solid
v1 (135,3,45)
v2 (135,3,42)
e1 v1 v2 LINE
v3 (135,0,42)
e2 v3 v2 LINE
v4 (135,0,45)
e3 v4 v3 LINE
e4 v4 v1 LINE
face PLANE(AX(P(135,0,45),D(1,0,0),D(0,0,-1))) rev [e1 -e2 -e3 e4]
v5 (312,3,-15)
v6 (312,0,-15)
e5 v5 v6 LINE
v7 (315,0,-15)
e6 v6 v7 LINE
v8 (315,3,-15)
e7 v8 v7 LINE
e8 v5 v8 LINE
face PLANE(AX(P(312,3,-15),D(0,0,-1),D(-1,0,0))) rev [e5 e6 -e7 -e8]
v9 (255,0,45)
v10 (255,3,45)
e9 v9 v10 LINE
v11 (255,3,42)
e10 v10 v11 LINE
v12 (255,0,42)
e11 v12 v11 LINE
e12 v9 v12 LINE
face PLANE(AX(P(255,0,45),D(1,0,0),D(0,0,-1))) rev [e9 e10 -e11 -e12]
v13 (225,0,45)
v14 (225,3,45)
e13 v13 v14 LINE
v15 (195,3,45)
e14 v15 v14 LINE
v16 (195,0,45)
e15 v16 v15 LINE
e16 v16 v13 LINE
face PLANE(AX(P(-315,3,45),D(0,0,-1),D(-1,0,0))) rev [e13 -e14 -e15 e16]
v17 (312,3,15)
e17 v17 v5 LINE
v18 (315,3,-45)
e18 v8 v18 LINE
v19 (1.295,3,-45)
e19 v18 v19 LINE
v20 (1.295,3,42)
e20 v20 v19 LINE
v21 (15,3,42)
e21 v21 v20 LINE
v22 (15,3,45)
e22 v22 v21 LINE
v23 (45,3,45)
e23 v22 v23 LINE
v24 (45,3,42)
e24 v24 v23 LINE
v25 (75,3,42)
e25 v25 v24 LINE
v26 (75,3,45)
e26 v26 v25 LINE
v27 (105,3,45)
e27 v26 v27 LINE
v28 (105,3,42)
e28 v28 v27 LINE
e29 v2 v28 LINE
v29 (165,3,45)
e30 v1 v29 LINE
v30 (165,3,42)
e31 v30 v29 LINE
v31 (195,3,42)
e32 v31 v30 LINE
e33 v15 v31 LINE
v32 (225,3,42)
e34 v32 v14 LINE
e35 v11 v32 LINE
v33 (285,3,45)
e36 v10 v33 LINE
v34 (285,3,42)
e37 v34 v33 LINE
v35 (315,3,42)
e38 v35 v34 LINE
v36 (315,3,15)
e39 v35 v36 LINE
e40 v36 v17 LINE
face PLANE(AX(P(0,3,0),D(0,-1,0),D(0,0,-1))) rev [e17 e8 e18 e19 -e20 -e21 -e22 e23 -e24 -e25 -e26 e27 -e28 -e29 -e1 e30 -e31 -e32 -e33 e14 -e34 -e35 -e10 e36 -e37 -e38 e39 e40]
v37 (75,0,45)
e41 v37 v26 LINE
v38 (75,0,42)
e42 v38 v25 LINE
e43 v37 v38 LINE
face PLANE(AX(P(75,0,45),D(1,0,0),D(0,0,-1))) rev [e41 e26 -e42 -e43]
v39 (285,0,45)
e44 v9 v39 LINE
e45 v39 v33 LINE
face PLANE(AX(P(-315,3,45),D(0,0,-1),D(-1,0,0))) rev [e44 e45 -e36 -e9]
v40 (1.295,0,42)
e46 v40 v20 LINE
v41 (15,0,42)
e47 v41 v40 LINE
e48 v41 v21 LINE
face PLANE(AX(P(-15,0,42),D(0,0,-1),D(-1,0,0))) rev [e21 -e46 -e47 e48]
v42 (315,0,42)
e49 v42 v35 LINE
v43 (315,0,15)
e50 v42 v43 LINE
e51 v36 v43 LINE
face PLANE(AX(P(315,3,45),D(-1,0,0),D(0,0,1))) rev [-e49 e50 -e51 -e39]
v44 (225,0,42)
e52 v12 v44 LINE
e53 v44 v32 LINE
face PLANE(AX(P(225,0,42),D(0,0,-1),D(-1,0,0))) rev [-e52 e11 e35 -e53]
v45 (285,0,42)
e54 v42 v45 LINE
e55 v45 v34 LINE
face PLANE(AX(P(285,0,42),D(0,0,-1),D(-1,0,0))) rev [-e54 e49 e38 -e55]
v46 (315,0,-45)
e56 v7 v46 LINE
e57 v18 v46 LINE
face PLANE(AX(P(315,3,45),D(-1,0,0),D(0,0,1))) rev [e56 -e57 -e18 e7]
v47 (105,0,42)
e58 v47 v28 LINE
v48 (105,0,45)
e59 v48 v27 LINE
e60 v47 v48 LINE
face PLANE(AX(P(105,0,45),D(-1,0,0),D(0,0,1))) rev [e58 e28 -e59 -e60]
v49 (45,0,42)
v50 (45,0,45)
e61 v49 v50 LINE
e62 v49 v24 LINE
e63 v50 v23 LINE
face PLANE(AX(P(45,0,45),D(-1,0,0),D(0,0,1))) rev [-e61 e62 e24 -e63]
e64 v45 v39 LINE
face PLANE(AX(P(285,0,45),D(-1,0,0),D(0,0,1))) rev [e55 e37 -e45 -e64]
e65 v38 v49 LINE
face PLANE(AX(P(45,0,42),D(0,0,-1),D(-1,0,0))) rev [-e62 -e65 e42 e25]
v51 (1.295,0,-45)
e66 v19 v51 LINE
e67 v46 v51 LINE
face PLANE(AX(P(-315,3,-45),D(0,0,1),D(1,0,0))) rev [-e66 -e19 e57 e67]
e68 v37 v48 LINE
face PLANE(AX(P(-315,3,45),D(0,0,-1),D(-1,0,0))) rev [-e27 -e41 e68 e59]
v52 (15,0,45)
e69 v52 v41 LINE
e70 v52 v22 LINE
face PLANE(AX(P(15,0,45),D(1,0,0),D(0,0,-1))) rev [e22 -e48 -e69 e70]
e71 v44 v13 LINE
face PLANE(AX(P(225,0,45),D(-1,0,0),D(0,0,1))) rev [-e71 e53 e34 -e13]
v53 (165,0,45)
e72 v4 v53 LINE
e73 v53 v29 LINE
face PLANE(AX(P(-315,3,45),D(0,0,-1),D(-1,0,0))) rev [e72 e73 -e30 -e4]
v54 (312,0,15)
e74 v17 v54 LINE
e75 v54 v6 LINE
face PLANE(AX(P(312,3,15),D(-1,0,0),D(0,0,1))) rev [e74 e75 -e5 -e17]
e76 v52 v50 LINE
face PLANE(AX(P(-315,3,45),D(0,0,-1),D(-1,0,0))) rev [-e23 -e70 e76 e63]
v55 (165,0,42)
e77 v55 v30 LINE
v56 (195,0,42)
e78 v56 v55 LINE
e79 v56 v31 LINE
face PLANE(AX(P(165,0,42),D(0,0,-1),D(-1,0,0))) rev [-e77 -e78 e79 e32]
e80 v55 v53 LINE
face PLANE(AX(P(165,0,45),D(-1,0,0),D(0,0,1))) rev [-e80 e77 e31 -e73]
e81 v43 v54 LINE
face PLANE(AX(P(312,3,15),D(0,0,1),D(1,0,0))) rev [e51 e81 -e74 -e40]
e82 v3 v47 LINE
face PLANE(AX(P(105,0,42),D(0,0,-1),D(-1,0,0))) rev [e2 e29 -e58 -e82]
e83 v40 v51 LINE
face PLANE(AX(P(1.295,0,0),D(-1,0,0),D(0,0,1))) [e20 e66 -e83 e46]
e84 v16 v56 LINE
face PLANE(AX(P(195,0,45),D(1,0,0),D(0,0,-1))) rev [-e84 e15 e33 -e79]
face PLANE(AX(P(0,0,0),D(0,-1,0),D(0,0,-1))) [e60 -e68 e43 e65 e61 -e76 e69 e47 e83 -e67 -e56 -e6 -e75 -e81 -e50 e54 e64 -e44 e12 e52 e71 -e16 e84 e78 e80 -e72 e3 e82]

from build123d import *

# Parameters (mm, degrees)
SKETCH1_W              = 630
SKETCH1_H              = 90
BOSS_EXTRUDE1_DEPTH    = 3
SKETCH3_W              = 30
SKETCH3_H              = 3
CUT_EXTRUDE1_DEPTH     = 3
LPATTERN1_COUNT        = 10
LPATTERN1_PITCH        = 60
LPATTERN1_COL_COUNT    = 2
LPATTERN1_COL_PITCH    = 60
CUT_EXTRUDE5_START     = -3
CUT_EXTRUDE5_OUTLINE_W = 3
CUT_EXTRUDE5_OUTLINE_H = 30
CUT_EXTRUDE5_DEPTH     = 3
SKETCH7_W              = 3
SKETCH7_H              = 30
CUT_EXTRUDE3_DEPTH     = 3
SKETCH13_W             = 3
SKETCH13_H             = 27
CUT_EXTRUDE4_DEPTH     = 10


# Read off the part's stored shape, not the designer's step: Cut-Extrude5
with BuildPart() as part:
    # Sketch1 → Boss-Extrude1 (new body)
    with BuildSketch(Plane(origin=(0, 0, 0), x_dir=(1, 0, 0), z_dir=(0, 1, 0))):
        Rectangle(SKETCH1_W, SKETCH1_H)
    extrude(amount=BOSS_EXTRUDE1_DEPTH)

    # Sketch3 → Cut-Extrude1 (cut)
    with BuildSketch(Plane(origin=(0, 3, 0), x_dir=(1, 0, 0), z_dir=(0, 1, 0))):
        with Locations((-240, -43.5)):
            Rectangle(SKETCH3_W, SKETCH3_H)
    cut_extrude1 = extrude(amount=-CUT_EXTRUDE1_DEPTH, mode=Mode.SUBTRACT)

    # LPattern1: Cut-Extrude1 ×10
    with Locations(*[(i * LPATTERN1_PITCH, 0, 0) for i in range(1, LPATTERN1_COUNT)]):
        add(cut_extrude1, mode=Mode.SUBTRACT)

    # LPattern1 col: Cut-Extrude1 ×2
    with Locations(*[(-i * LPATTERN1_COL_PITCH, 0, 0) for i in range(1, LPATTERN1_COL_COUNT)]):
        add(cut_extrude1, mode=Mode.SUBTRACT)

    # Cut-Extrude5 outline → Cut-Extrude5 (cut)
    with BuildSketch(Plane(origin=(0, 3, 0), x_dir=(1, 0, 0), z_dir=(0, 1, 0)).offset(CUT_EXTRUDE5_START)):
        with Locations((313.5, 1e-09)):
            Rectangle(CUT_EXTRUDE5_OUTLINE_W, CUT_EXTRUDE5_OUTLINE_H)
    extrude(amount=CUT_EXTRUDE5_DEPTH, mode=Mode.SUBTRACT)

    # Sketch7 → Cut-Extrude3 (cut)
    with BuildSketch(Plane(origin=(0, 3, 0), x_dir=(1, 0, 0), z_dir=(0, 1, 0))):
        with Locations((-313.5, 30)):
            Rectangle(SKETCH7_W, SKETCH7_H)
    extrude(amount=-CUT_EXTRUDE3_DEPTH, mode=Mode.SUBTRACT)

    # Sketch13 → Cut-Extrude4 (cut)
    with BuildSketch(Plane(origin=(0, 3, 0), x_dir=(1, 0, 0), z_dir=(0, 1, 0))):
        with Locations((-313.5, -28.5)):
            Rectangle(SKETCH13_W, SKETCH13_H)
    extrude(amount=-CUT_EXTRUDE4_DEPTH, mode=Mode.SUBTRACT)

    # SurfaceCut1
    split(bisect_by=Plane.ZY.offset(-1.295), keep=Keep.BOTTOM)


solid = part.part
